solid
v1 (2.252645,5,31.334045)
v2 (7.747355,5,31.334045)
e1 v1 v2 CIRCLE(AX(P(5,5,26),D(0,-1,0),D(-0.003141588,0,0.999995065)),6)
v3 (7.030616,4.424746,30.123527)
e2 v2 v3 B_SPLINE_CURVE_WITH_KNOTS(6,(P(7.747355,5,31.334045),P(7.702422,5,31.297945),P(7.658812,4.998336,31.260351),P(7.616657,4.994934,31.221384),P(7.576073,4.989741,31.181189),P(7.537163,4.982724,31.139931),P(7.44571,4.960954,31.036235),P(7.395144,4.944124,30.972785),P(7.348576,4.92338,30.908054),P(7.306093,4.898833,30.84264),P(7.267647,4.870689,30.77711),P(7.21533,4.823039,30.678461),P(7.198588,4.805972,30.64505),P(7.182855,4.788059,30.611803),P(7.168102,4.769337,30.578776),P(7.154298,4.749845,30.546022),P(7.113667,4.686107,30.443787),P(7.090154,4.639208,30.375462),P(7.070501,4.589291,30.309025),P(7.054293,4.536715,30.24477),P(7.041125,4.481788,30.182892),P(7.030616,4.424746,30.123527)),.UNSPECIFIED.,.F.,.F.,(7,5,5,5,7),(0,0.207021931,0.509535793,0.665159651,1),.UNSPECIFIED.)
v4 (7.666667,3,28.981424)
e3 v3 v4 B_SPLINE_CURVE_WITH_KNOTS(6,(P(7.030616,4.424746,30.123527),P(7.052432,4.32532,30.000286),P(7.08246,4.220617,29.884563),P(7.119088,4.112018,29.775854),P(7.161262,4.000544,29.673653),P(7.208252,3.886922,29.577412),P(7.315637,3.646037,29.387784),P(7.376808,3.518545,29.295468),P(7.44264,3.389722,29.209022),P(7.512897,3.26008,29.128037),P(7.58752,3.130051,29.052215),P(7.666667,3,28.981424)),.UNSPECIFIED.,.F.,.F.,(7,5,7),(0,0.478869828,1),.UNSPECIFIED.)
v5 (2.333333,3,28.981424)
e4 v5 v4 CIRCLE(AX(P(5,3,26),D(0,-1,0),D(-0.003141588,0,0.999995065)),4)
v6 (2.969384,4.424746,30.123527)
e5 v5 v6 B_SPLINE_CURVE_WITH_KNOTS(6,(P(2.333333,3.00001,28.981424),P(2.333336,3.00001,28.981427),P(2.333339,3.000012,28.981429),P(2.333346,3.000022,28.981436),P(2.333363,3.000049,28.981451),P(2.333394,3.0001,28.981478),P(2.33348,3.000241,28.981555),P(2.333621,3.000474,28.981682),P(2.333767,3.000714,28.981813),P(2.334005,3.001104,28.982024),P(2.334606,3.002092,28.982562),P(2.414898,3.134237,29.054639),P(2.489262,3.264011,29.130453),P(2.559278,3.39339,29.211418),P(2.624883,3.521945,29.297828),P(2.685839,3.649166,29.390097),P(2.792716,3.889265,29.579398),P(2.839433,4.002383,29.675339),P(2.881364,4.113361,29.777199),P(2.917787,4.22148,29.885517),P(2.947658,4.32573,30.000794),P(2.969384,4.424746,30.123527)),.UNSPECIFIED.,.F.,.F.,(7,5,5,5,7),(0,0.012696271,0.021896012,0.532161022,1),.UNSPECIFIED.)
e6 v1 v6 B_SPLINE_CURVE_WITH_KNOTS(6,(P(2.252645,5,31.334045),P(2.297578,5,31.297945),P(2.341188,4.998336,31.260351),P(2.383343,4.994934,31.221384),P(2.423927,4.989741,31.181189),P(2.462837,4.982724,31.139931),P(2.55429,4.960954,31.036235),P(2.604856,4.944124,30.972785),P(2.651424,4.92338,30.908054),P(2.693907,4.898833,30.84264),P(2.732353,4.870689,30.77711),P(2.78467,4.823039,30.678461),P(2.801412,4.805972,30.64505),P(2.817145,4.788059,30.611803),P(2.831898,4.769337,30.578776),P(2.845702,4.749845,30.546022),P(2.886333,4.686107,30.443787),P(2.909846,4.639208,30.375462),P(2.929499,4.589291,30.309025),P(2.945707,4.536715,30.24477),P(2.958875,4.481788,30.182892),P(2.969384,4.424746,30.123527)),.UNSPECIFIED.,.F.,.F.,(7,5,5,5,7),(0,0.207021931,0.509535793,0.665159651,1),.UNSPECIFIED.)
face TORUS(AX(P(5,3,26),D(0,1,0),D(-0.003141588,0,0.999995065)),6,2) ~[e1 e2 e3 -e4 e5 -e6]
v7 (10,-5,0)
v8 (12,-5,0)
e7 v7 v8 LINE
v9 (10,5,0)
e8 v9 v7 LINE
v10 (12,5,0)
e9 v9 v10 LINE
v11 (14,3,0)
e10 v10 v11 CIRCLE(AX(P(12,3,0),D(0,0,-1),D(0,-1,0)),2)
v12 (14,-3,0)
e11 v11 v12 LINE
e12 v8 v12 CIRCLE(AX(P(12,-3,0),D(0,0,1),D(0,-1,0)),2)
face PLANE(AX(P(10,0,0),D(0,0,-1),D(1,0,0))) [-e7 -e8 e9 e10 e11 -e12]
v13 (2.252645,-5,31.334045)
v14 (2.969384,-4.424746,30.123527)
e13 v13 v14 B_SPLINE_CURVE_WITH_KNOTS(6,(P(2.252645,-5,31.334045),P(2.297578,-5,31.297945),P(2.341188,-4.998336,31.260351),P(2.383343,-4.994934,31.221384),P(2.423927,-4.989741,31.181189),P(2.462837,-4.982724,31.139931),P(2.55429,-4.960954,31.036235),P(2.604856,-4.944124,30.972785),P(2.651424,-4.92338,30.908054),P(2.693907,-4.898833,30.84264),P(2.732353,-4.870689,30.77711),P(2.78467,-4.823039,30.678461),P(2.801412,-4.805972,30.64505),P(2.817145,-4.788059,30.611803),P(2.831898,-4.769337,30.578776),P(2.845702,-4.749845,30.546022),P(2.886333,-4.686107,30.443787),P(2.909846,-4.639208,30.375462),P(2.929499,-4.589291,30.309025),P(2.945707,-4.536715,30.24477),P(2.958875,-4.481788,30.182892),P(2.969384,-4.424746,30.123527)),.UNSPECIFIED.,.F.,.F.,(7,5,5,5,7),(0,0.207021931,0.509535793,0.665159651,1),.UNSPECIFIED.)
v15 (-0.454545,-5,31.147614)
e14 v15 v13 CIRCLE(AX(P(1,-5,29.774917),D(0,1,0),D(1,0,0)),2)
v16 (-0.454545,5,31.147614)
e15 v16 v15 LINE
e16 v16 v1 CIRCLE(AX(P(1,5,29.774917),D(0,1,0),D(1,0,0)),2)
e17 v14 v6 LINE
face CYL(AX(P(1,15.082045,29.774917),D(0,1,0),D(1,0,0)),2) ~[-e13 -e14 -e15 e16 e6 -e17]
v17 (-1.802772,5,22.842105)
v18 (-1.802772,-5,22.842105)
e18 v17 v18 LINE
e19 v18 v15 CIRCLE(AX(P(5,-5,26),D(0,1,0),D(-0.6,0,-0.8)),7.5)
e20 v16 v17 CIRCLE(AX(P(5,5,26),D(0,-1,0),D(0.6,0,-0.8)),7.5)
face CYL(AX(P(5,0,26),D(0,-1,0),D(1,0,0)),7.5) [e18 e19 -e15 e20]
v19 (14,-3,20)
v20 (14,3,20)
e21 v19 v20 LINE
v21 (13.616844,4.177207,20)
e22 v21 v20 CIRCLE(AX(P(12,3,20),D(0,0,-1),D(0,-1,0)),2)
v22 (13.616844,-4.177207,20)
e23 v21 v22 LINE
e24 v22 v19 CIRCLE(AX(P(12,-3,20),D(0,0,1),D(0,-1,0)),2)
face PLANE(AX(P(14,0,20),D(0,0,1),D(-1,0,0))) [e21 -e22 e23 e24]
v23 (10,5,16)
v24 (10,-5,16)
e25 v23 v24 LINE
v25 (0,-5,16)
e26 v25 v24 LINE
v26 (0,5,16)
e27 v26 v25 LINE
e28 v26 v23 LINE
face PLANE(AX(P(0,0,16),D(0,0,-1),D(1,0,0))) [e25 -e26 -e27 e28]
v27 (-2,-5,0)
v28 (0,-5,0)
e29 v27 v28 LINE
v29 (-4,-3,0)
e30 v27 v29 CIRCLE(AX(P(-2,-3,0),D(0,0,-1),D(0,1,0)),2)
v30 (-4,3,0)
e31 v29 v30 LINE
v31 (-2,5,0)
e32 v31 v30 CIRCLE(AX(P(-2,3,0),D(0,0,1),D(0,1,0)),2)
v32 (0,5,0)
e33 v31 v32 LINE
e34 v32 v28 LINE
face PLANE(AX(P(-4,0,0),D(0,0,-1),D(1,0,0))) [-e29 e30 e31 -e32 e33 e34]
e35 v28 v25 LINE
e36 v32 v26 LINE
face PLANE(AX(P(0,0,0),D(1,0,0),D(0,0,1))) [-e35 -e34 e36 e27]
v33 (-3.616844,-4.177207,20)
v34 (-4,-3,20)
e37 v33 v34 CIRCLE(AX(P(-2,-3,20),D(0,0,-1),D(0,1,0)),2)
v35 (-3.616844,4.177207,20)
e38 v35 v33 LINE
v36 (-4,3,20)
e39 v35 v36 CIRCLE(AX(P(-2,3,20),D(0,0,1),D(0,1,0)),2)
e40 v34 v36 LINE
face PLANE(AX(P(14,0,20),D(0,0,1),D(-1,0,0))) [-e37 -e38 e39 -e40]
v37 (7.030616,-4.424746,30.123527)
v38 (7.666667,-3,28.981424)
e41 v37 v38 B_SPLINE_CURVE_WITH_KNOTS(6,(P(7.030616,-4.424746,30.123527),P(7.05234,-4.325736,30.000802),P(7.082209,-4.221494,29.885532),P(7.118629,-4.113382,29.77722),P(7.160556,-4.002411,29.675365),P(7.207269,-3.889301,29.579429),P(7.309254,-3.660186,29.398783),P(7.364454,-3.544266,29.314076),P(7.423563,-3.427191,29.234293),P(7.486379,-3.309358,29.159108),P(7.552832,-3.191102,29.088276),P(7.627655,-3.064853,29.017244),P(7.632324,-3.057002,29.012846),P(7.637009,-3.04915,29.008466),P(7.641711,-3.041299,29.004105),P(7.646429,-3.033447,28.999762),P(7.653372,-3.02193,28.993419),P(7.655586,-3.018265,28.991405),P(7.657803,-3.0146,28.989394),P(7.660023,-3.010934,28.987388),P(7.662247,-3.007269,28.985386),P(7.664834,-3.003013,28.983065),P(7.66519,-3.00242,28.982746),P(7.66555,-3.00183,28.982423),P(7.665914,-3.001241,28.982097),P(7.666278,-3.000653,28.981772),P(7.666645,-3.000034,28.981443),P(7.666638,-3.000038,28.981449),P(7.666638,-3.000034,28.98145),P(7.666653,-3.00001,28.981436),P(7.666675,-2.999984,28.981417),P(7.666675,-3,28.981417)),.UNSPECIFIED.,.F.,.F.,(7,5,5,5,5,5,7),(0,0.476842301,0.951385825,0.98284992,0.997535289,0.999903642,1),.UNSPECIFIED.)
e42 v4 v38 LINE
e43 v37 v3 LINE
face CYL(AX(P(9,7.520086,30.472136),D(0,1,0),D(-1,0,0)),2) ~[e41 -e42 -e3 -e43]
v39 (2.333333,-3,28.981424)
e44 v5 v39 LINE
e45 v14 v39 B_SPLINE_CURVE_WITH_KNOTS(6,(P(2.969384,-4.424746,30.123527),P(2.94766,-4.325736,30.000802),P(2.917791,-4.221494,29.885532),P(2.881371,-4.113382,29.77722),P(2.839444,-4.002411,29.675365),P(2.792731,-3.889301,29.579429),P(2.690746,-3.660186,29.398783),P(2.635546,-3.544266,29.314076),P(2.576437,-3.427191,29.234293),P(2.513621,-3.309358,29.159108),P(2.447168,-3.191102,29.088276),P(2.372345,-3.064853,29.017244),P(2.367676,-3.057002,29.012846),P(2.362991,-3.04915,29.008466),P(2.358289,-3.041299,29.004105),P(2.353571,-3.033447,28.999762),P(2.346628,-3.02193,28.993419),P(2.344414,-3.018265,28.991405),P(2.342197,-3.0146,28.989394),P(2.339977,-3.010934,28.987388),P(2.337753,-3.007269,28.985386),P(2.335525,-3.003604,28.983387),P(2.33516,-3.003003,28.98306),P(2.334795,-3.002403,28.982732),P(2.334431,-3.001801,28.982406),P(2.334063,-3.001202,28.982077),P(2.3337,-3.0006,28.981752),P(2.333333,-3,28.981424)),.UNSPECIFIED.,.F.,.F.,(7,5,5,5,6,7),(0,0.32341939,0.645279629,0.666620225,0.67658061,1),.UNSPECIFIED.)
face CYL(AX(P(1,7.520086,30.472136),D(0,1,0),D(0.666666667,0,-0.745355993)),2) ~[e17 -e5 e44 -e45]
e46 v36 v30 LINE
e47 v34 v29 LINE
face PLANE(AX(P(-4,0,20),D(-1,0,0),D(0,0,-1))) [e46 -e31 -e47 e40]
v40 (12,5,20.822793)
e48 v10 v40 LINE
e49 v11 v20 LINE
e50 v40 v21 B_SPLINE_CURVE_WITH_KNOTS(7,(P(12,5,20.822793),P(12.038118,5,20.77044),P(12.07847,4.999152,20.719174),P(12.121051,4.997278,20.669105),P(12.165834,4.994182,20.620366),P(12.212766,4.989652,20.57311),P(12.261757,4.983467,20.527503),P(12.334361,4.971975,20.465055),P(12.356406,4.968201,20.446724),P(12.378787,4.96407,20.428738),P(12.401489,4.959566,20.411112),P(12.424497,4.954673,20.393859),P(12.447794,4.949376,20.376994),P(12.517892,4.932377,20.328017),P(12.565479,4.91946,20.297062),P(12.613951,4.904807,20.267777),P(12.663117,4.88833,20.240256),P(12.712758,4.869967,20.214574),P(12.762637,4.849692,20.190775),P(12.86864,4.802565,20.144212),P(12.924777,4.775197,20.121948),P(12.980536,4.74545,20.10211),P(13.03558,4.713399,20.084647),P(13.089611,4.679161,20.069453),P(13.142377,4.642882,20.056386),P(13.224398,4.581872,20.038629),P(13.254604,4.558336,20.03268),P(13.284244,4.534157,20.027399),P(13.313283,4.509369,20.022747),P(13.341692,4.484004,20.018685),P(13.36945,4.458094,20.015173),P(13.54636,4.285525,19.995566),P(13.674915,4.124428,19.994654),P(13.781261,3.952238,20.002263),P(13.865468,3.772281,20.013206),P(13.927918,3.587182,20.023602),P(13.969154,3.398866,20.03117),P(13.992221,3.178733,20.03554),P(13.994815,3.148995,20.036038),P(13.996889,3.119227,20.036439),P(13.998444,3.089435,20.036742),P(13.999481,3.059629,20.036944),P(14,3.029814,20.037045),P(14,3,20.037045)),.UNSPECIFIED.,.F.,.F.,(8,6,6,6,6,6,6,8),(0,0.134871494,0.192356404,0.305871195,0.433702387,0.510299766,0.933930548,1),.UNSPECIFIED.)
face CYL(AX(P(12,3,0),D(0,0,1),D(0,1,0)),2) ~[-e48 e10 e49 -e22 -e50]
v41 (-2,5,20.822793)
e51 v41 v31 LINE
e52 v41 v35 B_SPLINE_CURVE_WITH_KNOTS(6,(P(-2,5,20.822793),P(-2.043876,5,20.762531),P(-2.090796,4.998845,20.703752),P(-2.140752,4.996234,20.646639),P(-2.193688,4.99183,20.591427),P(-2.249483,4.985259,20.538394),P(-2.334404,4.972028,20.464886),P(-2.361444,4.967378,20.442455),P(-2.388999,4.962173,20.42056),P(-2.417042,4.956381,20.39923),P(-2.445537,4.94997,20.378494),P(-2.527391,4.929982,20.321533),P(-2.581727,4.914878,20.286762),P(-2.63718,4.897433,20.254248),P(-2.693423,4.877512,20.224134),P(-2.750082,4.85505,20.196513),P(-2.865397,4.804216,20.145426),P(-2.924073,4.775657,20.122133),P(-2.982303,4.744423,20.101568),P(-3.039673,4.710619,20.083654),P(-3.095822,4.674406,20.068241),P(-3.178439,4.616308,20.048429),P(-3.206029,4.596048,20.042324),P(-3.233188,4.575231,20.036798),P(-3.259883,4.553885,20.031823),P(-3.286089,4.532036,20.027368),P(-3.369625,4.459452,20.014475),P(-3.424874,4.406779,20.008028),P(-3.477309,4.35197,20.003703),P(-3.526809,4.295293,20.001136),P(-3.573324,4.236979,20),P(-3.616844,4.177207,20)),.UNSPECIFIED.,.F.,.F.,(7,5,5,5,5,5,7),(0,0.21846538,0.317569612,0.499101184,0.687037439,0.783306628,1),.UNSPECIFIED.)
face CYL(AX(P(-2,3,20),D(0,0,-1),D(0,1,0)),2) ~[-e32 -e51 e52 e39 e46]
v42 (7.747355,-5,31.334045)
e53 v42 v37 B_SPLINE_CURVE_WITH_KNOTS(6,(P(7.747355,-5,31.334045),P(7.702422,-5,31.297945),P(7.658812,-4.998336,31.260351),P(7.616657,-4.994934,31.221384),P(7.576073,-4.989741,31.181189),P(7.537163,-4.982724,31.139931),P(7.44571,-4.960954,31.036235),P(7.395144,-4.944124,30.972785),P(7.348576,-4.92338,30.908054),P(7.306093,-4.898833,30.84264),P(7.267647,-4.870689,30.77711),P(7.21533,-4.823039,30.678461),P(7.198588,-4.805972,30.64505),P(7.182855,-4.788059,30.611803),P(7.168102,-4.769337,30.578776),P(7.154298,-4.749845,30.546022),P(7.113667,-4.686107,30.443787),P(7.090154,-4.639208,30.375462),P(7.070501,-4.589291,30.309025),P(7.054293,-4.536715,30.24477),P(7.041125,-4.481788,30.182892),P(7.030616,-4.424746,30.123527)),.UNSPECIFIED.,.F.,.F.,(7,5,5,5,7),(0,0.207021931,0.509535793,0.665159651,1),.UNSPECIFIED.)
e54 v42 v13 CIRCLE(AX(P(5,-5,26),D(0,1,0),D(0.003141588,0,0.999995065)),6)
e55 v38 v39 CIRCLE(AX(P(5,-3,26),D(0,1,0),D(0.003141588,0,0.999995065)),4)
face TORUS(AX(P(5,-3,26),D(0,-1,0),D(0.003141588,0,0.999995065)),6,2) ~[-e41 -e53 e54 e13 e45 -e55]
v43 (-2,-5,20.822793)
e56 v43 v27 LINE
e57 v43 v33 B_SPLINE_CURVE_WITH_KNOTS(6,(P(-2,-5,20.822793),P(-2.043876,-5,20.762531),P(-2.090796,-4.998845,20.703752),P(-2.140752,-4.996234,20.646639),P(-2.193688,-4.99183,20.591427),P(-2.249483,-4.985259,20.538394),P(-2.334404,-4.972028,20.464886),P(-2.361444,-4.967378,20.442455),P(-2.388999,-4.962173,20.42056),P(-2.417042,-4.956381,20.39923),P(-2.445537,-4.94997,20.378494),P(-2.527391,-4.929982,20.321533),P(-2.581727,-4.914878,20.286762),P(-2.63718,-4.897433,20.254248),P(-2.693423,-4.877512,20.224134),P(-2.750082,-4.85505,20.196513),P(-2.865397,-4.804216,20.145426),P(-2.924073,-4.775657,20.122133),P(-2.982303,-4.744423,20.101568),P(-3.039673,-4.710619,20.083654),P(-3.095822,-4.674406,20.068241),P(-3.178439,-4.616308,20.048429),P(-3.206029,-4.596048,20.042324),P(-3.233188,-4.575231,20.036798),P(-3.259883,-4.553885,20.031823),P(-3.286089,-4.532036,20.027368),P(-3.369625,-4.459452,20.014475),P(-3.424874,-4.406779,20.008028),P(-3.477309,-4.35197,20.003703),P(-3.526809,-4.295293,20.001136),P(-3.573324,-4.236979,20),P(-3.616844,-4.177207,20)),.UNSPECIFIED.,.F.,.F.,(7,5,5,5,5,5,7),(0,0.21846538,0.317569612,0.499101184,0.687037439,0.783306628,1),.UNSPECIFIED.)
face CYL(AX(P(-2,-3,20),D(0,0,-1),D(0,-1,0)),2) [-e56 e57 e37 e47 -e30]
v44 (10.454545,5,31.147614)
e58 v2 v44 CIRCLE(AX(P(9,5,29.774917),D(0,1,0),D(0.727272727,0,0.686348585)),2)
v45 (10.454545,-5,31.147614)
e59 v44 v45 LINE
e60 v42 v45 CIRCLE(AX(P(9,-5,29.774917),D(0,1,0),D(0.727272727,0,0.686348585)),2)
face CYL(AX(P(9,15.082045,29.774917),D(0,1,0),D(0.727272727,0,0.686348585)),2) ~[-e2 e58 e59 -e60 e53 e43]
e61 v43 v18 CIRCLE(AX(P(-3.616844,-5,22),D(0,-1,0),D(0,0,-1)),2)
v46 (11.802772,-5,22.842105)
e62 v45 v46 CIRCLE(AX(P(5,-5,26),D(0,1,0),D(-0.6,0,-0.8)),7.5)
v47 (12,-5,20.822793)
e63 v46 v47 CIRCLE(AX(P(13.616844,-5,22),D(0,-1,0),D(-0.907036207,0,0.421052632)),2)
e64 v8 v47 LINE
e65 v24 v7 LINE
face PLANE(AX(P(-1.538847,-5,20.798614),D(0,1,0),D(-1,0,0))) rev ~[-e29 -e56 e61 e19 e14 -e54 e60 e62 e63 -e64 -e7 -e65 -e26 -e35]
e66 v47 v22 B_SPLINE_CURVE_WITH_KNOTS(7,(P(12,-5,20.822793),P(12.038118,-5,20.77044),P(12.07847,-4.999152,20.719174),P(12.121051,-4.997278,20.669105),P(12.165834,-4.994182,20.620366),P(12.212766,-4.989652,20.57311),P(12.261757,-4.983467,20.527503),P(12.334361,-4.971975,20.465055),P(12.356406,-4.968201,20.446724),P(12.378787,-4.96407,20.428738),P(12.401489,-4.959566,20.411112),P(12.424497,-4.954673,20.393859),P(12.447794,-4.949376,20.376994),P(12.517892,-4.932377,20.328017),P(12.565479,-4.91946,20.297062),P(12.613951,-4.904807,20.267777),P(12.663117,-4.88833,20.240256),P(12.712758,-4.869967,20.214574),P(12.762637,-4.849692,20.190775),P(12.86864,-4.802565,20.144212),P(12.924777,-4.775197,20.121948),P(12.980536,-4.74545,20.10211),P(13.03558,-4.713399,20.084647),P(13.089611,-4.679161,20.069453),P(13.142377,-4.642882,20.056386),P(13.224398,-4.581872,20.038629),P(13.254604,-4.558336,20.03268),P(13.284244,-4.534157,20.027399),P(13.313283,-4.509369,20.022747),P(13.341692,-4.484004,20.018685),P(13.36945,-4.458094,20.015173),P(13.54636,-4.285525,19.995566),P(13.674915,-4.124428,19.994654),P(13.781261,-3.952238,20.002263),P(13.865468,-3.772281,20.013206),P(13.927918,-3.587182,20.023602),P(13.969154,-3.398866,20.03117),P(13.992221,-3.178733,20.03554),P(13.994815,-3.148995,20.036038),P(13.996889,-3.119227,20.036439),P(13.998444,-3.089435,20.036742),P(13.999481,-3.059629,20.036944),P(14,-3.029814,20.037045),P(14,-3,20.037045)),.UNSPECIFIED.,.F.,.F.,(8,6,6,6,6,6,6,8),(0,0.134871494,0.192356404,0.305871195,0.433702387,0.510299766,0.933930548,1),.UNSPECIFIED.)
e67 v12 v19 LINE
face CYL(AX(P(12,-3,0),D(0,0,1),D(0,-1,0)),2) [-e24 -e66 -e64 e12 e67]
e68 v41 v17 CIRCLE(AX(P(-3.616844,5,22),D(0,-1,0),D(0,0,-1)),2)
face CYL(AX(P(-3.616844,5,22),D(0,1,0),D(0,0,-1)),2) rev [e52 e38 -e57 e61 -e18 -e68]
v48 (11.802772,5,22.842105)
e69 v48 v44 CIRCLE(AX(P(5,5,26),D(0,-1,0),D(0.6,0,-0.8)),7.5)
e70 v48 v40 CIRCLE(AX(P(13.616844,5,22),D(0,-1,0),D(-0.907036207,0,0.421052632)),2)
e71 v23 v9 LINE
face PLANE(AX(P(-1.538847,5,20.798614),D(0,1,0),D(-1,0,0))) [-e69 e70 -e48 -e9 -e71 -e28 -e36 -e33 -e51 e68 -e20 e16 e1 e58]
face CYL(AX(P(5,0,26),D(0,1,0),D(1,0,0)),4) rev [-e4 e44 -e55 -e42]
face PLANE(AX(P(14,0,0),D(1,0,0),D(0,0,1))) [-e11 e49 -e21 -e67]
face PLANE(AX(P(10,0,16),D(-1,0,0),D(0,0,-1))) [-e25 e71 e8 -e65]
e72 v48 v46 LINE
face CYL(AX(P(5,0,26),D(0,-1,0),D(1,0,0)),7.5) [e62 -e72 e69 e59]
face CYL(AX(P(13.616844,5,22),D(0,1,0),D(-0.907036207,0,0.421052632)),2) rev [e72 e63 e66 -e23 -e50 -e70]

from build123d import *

# Parameters (mm, degrees)
F1_DEPTH    = 5
F2_R        = 7.5
F2_R_2      = 4
F3_DEPTH    = 5
F4_W        = 4
F4_H        = 10
F5_DEPTH    = 5.7
F6_T1_DEPTH = 10
F6_T3_DEPTH = 30.1640895286
F6_T5_DEPTH = 15.0401716993
F7_R        = 2
F8_T2_ANGLE = 359.64
F8_T4_ANGLE = 359.64


# Not quite as in the source:
# - a fillet or chamfer that OpenCascade refuses, or shapes differently, is made with other operations: its cross-section is extruded or revolved along the edge and cut away or added


with BuildPart() as f1:
    # F0 (on Front) → F1 (new body, symmetric)
    with BuildSketch(Plane.XZ):
        Polygon((-4, 0), (0, 0), (0, 16), (10, 16), (10, 0), (14, 0), (14, 20), (-4, 20), align=None)
    extrude(amount=F1_DEPTH, both=True)

    # F2 (on Front) → F3 (join, symmetric)
    with BuildSketch(Plane.XZ):
        with Locations((5, 26)):
            Circle(F2_R)
        with Locations((5, 26)):
            Circle(F2_R_2, mode=Mode.SUBTRACT)
    extrude(amount=F3_DEPTH, both=True)

    # F4 (on Front) → F5 (cut, symmetric)
    with BuildSketch(Plane.XZ):
        with Locations((5, 31.8401088891)):
            Rectangle(F4_W, F4_H)
    extrude(amount=F5_DEPTH, both=True, mode=Mode.SUBTRACT)

    # F6: fillet of radius 2 on 6 edges, made by hand

    # F6_s2 → F6_t1 (join)
    with BuildSketch(Plane.XZ.offset(-5)):
        with BuildLine():
            ThreePointArc((-3.6168439698, 20), (-1.930989509, 20.9239448263), (-1.8027715551, 22.8421052632))
            ThreePointArc((-1.8027715551, 22.8421052632), (-0.8273108539, 21.2785120765), (0.5, 20))
            Line((0.5, 20), (-3.6168439698, 20))
        make_face()
        with BuildLine():
            ThreePointArc((11.8027715551, 22.8421052632), (11.930989509, 20.9239448263), (13.6168439698, 20))
            Line((13.6168439698, 20), (9.5, 20))
            ThreePointArc((9.5, 20), (10.8273108539, 21.2785120765), (11.8027715551, 22.8421052632))
        make_face()
    extrude(amount=F6_T1_DEPTH)

    # F6_s4 → F6_t3 (cut)
    with BuildSketch(Plane.XZ.offset(-15.0820447643)):
        with BuildLine():
            ThreePointArc((10.4545454545, 31.1476143877), (8.2614510541, 31.6335579722), (7, 29.7749172176))
            Line((7, 29.7749172176), (7, 33.2284161474))
            ThreePointArc((7, 33.2284161474), (8.869753994, 32.4245625552), (10.4545454545, 31.1476143877))
        make_face()
        with BuildLine():
            ThreePointArc((3, 29.7749172176), (1.7385489459, 31.6335579722), (-0.4545454545, 31.1476143877))
            ThreePointArc((-0.4545454545, 31.1476143877), (1.130246006, 32.4245625552), (3, 33.2284161474))
            Line((3, 33.2284161474), (3, 29.7749172176))
        make_face()
    extrude(amount=F6_T3_DEPTH, mode=Mode.SUBTRACT)

    # F6_s6 → F6_t5 (cut)
    with BuildSketch(Plane.XZ.offset(-7.5200858497)):
        with BuildLine():
            ThreePointArc((7, 30.472135955), (7.1742581416, 29.6556393741), (7.6666666667, 28.98142397))
            ThreePointArc((7.6666666667, 28.98142397), (7.3457810792, 29.2399554207), (7, 29.4641016151))
            Line((7, 29.4641016151), (7, 30.472135955))
        make_face()
        with BuildLine():
            ThreePointArc((2.3333333333, 28.98142397), (2.8257418584, 29.6556393741), (3, 30.472135955))
            Line((3, 30.472135955), (3, 29.4641016151))
            ThreePointArc((3, 29.4641016151), (2.6542189208, 29.2399554207), (2.3333333333, 28.98142397))
        make_face()
    extrude(amount=F6_T5_DEPTH, mode=Mode.SUBTRACT)

    # F7
    f7_edges = [f1.edges().sort_by_distance(p)[0] for p in [
        (-4, -5, 10),
        (14, -5, 10),
        (14, 5, 10),
        (-4, 5, 10),
    ]]
    fillet(f7_edges, radius=F7_R)

    # F8: fillet of radius 2 on 2 edges, made by hand

    # F8_s1 → F8_t2 (revolve, cut)
    with BuildSketch(Plane(origin=(4.9182697806, 0, -0.015451251), x_dir=(0, 1, 0), z_dir=(-0.9999950652, 0, 0.0031415875))):
        with BuildLine():
            ThreePointArc((-5, -32.0155796327), (-4.4142135624, -30.6013660703), (-3, -30.0155796327))
            Line((-3, -30.0155796327), (-5, -30.0155796327))
            Line((-5, -30.0155796327), (-5, -32.0155796327))
        make_face()
    revolve(axis=Axis((5, -5, 26), (0, 1, 0)), revolution_arc=F8_T2_ANGLE, mode=Mode.SUBTRACT)

    # F8_s3 → F8_t4 (revolve, cut)
    with BuildSketch(Plane(origin=(5.0816315237, 0, 0.0159644688), x_dir=(0, 1, 0), z_dir=(0.9999950652, 0, 0.0031415875))):
        with BuildLine():
            ThreePointArc((5, 31.9841637578), (4.4142135624, 30.5699501954), (3, 29.9841637578))
            Line((3, 29.9841637578), (5, 29.9841637578))
            Line((5, 29.9841637578), (5, 31.9841637578))
        make_face()
    revolve(axis=Axis((5, 5, 26), (0, -1, 0)), revolution_arc=F8_T4_ANGLE, mode=Mode.SUBTRACT)


solid = f1.part
